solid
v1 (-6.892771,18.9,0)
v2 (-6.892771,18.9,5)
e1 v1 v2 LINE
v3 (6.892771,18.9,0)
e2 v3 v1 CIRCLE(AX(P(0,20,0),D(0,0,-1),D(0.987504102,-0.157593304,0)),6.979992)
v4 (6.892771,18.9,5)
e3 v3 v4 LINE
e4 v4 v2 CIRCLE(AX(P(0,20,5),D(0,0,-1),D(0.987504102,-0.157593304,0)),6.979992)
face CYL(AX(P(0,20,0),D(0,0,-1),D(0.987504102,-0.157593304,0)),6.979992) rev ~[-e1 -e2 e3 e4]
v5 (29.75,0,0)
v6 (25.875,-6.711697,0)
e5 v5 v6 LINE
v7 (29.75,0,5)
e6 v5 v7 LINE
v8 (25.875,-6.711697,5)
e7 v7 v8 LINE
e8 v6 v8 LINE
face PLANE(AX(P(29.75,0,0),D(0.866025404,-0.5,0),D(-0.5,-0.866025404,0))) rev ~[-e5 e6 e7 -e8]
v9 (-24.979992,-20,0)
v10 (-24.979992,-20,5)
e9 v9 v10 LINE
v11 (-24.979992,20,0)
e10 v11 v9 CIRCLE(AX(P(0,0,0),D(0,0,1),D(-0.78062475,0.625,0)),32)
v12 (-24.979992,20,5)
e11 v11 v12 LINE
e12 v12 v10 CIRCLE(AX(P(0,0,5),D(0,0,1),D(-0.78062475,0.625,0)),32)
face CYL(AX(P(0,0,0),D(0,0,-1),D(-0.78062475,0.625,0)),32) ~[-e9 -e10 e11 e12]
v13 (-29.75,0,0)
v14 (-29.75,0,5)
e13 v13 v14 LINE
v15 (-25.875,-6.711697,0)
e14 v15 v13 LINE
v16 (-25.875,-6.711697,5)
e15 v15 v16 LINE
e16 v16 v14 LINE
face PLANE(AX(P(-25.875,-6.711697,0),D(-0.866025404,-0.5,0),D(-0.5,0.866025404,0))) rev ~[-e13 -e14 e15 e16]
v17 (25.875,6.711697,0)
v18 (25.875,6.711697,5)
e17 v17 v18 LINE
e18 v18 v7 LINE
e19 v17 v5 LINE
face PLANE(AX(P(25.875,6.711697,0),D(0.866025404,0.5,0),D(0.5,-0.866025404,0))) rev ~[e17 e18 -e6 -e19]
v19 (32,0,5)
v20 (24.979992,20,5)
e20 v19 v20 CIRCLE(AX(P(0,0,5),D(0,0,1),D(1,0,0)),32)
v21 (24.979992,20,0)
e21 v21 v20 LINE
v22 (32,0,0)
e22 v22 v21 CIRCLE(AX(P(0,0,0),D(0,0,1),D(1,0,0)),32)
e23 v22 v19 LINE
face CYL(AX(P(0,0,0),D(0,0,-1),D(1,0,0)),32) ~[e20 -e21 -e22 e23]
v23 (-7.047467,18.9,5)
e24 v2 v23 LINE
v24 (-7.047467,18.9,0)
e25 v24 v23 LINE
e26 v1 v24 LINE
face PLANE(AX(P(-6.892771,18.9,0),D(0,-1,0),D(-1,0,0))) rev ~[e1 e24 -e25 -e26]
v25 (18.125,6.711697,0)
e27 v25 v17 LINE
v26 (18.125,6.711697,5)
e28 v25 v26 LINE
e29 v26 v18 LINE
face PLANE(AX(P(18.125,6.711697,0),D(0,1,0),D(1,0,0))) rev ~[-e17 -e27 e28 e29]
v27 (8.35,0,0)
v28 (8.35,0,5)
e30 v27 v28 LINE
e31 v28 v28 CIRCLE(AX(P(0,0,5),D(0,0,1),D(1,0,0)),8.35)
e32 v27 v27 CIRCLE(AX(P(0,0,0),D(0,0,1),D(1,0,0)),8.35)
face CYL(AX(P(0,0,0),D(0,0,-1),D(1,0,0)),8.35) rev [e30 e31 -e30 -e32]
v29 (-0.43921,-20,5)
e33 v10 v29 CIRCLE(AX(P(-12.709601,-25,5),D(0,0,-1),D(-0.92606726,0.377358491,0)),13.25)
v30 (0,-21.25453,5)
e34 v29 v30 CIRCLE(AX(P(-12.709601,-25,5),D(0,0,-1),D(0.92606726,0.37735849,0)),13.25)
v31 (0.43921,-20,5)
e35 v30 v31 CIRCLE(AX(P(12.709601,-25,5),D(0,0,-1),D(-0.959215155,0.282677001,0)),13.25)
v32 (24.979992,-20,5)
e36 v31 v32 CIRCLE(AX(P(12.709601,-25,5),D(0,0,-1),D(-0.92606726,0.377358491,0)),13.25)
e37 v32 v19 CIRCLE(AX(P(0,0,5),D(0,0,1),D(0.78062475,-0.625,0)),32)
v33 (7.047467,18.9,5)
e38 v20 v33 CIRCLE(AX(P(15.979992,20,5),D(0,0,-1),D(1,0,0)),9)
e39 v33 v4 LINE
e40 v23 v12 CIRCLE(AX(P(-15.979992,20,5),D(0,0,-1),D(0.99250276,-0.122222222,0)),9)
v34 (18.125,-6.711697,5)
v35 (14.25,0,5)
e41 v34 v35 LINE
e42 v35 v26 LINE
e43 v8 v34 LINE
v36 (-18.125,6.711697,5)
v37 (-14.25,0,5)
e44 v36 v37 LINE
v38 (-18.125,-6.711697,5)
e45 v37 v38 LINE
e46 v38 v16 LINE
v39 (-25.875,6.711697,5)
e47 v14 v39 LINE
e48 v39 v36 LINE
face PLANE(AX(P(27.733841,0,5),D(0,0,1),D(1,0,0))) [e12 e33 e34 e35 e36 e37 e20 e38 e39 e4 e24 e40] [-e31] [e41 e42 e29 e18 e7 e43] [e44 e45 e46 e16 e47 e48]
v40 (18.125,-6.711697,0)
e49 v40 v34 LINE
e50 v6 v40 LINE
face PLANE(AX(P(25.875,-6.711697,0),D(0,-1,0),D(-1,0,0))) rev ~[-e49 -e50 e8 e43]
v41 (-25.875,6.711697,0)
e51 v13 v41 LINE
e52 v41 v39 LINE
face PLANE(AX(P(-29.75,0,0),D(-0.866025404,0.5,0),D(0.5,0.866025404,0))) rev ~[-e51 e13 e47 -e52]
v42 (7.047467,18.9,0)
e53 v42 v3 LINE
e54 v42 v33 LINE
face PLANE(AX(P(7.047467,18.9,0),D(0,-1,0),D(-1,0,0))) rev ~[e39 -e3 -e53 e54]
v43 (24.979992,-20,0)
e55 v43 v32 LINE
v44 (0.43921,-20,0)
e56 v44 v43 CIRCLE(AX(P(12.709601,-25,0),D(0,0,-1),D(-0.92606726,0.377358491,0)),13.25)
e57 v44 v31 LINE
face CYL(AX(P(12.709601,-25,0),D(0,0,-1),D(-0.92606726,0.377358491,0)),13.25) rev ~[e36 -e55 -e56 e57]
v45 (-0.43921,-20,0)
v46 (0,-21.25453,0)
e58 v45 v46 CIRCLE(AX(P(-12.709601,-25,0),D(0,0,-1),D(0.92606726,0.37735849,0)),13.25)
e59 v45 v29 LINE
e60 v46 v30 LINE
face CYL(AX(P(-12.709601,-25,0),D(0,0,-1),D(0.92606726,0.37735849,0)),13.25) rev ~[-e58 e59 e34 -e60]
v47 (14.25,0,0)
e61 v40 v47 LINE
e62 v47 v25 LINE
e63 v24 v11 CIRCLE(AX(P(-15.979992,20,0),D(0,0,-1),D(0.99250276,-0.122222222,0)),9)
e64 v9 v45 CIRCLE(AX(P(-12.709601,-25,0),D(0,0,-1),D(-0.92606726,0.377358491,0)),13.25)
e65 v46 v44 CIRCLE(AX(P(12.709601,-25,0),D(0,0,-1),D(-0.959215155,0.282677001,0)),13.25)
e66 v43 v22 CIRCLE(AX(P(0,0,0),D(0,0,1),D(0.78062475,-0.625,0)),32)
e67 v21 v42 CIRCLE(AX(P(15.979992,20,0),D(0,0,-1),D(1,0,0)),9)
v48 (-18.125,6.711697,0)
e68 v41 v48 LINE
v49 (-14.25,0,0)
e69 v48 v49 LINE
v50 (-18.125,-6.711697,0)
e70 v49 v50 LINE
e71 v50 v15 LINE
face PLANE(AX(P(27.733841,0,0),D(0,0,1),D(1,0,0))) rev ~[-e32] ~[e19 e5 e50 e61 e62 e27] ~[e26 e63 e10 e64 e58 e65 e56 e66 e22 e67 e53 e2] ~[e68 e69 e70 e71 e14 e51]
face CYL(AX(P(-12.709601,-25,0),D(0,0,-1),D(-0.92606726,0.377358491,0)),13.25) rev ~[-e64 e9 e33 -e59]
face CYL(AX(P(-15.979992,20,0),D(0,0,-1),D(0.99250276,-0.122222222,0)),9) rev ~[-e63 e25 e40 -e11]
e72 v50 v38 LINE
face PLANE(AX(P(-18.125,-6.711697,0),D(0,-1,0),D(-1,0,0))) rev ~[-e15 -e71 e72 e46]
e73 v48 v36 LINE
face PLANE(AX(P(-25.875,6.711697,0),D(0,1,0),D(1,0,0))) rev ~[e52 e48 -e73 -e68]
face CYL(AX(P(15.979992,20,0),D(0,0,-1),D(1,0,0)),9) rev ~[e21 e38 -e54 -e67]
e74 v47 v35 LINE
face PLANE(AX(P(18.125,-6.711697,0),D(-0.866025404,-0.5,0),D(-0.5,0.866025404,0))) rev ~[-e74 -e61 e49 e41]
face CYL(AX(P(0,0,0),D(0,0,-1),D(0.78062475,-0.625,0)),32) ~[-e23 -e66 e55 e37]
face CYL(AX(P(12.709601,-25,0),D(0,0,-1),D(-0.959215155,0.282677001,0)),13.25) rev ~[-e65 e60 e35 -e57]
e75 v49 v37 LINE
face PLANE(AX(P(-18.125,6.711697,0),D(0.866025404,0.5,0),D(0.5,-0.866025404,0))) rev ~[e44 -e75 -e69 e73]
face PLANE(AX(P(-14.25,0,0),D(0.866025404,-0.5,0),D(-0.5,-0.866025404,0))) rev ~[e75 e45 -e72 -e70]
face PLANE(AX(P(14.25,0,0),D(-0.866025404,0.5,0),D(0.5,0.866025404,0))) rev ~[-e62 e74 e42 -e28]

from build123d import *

# Parameters (mm, degrees)
F0_R     = 8.35
F1_DEPTH = 5


with BuildPart() as f1:
    # F0 (on Top) → F1 (new body)
    with BuildSketch(Plane.XY):
        with BuildLine():
            ThreePointArc((24.9799919936, -20), (30.1940370255, -10.5981190832), (32, 0))
            ThreePointArc((32, 0), (30.1940370255, 10.5981190832), (24.9799919936, 20))
            Line((24.9799919936, 20), (24.9799919936, 6.7116968793))
            Line((24.9799919936, 6.7116968793), (25.875, 6.7116968793))
            Line((25.875, 6.7116968793), (29.75, 0))
            Line((29.75, 0), (25.875, -6.7116968793))
            Line((25.875, -6.7116968793), (24.9799919936, -6.7116968793))
            Line((24.9799919936, -6.7116968793), (24.9799919936, -20))
        make_face()
        with BuildLine():
            Line((24.9799919936, 6.7116968793), (24.9799919936, 20))
            ThreePointArc((24.9799919936, 20), (16.5310257714, 11.0168846286), (7.0474671546, 18.9))
            Line((7.0474671546, 18.9), (6.8927707223, 18.9))
            ThreePointArc((6.8927707223, 18.9), (0, 13.0200080064), (-6.8927707223, 18.9))
            Line((-6.8927707223, 18.9), (-7.0474671546, 18.9))
            ThreePointArc((-7.0474671546, 18.9), (-16.5310257714, 11.0168846286), (-24.9799919936, 20))
            Line((-24.9799919936, 20), (-24.9799919936, 6.7116968793))
            Line((-24.9799919936, 6.7116968793), (-18.125, 6.7116968793))
            Line((-18.125, 6.7116968793), (-14.25, 0))
            Line((-14.25, 0), (-18.125, -6.7116968793))
            Line((-18.125, -6.7116968793), (-24.9799919936, -6.7116968793))
            Line((-24.9799919936, -6.7116968793), (-24.9799919936, -20))
            ThreePointArc((-24.9799919936, -20), (-12.7096008018, -11.75), (-0.43920961, -20))
            Line((-0.43920961, -20), (0.43920961, -20))
            ThreePointArc((0.43920961, -20), (12.7096008018, -11.75), (24.9799919936, -20))
            Line((24.9799919936, -20), (24.9799919936, -6.7116968793))
            Line((24.9799919936, -6.7116968793), (18.125, -6.7116968793))
            Line((18.125, -6.7116968793), (14.25, 0))
            Line((14.25, 0), (18.125, 6.7116968793))
            Line((18.125, 6.7116968793), (24.9799919936, 6.7116968793))
        make_face()
        Circle(F0_R, mode=Mode.SUBTRACT)
        with BuildLine():
            ThreePointArc((0, -21.2545297412), (0.2038636697, -20.6217539149), (0.43920961, -20))
            Line((0.43920961, -20), (-0.43920961, -20))
            ThreePointArc((-0.43920961, -20), (-0.2038636697, -20.6217539149), (0, -21.2545297412))
        make_face()
        with BuildLine():
            Line((-24.9799919936, 6.7116968793), (-24.9799919936, 20))
            ThreePointArc((-24.9799919936, 20), (-32, 0), (-24.9799919936, -20))
            Line((-24.9799919936, -20), (-24.9799919936, -6.7116968793))
            Line((-24.9799919936, -6.7116968793), (-25.875, -6.7116968793))
            Line((-25.875, -6.7116968793), (-29.75, 0))
            Line((-29.75, 0), (-25.875, 6.7116968793))
            Line((-25.875, 6.7116968793), (-24.9799919936, 6.7116968793))
        make_face()
    extrude(amount=F1_DEPTH)


solid = f1.part
